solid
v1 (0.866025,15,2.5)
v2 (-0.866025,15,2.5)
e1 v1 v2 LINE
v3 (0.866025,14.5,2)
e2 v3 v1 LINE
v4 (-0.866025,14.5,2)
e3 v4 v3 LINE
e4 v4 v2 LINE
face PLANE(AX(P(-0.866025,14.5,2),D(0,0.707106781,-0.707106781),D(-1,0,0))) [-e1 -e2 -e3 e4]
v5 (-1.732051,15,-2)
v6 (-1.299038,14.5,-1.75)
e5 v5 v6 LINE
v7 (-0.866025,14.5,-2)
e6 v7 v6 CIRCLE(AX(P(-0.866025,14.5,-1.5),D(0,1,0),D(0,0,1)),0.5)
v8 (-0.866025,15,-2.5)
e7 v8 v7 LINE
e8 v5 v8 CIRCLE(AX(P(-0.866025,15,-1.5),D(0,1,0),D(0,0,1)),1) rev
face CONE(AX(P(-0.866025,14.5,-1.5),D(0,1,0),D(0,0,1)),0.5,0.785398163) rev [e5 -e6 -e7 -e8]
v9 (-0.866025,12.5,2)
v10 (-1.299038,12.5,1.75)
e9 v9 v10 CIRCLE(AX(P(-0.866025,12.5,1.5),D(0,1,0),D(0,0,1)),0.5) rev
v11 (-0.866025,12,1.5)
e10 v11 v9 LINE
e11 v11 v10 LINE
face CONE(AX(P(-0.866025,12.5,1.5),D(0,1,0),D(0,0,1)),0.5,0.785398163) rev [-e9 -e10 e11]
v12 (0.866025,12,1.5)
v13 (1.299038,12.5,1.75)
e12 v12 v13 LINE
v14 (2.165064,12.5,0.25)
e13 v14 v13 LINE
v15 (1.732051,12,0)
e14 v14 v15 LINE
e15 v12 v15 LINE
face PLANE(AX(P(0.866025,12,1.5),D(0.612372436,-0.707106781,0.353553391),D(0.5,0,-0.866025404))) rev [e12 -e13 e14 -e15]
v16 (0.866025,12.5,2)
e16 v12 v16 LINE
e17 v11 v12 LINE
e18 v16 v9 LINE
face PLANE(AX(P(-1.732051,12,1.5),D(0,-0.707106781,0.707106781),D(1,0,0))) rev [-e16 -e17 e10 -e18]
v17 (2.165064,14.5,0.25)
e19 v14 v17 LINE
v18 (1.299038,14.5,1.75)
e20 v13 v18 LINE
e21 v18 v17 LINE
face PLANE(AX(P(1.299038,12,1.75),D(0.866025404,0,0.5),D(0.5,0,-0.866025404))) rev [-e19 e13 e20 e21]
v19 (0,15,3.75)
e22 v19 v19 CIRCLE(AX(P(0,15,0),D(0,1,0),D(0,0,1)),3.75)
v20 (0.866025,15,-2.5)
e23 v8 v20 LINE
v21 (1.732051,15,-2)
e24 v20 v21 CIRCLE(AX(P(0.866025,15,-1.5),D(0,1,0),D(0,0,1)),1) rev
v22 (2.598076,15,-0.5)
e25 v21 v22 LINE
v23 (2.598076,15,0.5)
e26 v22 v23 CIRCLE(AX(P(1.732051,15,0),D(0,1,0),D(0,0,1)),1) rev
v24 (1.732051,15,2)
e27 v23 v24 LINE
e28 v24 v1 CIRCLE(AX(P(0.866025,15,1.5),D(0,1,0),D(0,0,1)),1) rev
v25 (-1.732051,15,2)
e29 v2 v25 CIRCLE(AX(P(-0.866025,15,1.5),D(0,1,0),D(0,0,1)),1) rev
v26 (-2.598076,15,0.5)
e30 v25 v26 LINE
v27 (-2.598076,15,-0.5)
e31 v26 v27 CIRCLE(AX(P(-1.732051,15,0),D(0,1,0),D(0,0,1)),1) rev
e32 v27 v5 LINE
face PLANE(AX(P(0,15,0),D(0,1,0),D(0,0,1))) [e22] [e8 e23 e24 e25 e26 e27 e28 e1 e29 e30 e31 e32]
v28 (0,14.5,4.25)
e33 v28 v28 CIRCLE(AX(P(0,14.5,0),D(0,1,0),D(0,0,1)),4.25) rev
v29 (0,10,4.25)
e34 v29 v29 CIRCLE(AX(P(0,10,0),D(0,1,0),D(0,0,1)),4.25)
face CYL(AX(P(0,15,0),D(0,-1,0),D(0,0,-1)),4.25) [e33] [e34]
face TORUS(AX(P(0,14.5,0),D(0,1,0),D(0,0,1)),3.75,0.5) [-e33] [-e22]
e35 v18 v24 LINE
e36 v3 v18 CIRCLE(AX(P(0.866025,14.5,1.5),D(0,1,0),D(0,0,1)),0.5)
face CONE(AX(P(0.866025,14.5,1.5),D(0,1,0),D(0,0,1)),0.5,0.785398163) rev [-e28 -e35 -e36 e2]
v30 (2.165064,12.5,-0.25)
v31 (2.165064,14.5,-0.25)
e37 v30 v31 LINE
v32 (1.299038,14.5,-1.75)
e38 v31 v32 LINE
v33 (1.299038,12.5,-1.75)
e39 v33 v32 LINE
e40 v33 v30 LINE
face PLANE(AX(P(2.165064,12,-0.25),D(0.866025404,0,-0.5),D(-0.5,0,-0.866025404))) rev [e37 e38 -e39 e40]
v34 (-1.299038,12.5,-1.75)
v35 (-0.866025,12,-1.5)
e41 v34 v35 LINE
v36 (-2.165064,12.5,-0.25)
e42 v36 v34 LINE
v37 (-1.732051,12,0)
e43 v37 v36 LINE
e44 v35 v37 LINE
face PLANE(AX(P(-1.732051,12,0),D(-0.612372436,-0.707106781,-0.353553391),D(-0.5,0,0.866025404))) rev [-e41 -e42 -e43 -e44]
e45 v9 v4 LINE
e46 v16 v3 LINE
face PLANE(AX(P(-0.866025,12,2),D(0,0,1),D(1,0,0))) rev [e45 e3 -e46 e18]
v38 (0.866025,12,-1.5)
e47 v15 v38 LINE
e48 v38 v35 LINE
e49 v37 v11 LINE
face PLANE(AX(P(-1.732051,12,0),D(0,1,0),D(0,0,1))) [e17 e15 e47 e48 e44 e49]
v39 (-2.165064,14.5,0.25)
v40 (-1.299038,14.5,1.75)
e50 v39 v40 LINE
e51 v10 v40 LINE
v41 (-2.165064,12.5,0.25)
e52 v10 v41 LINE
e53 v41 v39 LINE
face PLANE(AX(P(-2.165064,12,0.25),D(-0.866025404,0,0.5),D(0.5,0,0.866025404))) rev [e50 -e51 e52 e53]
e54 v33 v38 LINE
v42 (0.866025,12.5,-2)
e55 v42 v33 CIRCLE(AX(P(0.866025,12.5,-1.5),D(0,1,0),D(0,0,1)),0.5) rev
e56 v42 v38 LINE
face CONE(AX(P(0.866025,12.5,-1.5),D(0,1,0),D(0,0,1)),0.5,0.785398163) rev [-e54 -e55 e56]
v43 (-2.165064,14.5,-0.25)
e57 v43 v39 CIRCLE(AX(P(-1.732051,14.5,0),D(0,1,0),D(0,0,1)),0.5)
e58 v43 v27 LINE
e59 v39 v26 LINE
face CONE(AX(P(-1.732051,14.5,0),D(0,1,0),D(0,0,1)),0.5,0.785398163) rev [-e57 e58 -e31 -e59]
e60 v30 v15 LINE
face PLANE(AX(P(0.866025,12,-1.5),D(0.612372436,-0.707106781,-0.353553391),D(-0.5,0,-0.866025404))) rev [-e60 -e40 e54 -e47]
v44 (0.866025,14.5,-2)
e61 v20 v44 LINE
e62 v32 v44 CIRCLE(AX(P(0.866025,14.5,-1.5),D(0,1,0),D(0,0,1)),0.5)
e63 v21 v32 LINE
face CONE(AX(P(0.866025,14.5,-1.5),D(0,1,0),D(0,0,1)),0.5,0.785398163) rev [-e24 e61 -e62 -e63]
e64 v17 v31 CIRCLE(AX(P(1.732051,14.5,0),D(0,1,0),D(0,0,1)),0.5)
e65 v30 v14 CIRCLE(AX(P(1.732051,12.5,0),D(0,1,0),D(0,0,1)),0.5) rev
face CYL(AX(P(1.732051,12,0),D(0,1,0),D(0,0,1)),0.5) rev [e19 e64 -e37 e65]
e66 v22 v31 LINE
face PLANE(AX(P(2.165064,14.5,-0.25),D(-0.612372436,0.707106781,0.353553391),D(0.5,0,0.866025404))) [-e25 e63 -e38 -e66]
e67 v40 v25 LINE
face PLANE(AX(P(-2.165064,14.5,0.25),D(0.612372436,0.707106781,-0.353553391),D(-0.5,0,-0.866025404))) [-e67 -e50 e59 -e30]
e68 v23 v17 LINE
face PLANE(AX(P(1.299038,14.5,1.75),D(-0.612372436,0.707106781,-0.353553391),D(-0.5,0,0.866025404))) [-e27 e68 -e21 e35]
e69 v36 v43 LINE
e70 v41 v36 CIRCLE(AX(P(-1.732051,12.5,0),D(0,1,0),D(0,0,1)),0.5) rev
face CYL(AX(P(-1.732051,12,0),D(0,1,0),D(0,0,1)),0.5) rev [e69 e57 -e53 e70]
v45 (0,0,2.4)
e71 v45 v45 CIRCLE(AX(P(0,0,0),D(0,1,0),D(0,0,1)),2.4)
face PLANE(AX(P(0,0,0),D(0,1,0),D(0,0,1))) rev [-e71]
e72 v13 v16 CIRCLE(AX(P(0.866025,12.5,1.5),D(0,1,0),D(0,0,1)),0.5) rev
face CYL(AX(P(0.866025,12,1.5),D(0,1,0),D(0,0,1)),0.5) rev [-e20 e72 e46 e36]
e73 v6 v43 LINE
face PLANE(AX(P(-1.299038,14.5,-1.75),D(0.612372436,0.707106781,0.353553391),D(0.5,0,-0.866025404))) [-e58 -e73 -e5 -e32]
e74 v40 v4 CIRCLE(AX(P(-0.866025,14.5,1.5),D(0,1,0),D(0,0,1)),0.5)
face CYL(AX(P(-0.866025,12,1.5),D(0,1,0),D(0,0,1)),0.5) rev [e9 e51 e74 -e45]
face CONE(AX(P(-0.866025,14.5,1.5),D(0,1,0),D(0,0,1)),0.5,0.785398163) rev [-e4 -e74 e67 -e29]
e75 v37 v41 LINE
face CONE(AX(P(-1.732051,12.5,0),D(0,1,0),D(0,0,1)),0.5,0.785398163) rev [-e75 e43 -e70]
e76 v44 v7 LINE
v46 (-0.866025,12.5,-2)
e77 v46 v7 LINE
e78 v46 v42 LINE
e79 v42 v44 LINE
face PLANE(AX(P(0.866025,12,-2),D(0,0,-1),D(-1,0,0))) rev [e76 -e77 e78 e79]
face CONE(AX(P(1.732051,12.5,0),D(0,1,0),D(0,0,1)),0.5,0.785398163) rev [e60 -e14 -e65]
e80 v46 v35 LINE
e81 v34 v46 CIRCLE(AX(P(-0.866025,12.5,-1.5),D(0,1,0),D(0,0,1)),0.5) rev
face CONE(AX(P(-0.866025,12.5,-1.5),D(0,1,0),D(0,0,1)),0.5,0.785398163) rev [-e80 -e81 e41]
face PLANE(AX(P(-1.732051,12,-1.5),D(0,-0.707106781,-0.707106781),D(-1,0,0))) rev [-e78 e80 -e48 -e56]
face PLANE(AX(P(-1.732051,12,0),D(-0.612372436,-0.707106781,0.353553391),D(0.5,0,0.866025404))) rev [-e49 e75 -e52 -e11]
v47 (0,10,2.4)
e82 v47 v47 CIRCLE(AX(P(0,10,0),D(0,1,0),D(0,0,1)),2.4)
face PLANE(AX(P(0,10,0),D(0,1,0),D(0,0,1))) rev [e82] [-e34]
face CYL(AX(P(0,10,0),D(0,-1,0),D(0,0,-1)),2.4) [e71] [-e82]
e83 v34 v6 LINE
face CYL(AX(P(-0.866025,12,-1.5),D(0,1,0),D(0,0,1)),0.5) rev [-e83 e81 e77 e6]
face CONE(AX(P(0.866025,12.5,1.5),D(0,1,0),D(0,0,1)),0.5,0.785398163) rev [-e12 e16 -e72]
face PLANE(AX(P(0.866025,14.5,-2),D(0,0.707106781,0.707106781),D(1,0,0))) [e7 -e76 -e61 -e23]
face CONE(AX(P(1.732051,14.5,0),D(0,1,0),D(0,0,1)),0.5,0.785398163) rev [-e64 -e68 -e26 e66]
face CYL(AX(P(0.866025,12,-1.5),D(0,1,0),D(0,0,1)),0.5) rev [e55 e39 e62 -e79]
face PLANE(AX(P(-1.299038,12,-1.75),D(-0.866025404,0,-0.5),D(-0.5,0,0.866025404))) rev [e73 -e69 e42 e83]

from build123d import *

# Parameters (mm, degrees)
SKETCH1_R           = 2.4
BOSS_EXTRUDE1_DEPTH = 10
SKETCH2_R           = 4.25
BOSS_EXTRUDE2_DEPTH = 5
CUT_EXTRUDE1_DEPTH  = 3
CHAMFER1_SIZE       = 0.5
FILLET1_R           = 0.5


with BuildPart() as part:
    # Sketch1 → Boss-Extrude1 (new body)
    with BuildSketch(Plane(origin=(0, 0, 0), x_dir=(1, 0, 0), z_dir=(0, 1, 0))):
        with Locations(Location((0, 0, 0), (0, 0, 270))):
            Circle(SKETCH1_R)
    extrude(amount=BOSS_EXTRUDE1_DEPTH)

    # Sketch2 → Boss-Extrude2 (add)
    with BuildSketch(Plane(origin=(0, 10, 0), x_dir=(1, 0, 0), z_dir=(0, 1, 0))):
        with Locations(Location((0, 0, 0), (0, 0, 270))):
            Circle(SKETCH2_R)
    extrude(amount=BOSS_EXTRUDE2_DEPTH)

    # Sketch3 → Cut-Extrude1 (cut)
    with BuildSketch(Plane(origin=(0, 15, 0), x_dir=(1, 0, 0), z_dir=(0, 1, 0))):
        with BuildLine():
            Line((2.165063509, 0.25), (1.299038106, 1.75))
            ThreePointArc((1.299038106, 1.75), (1.116025404, 1.933012702), (0.866025404, 2))
            Line((0.866025404, 2), (-0.866025404, 2))
            ThreePointArc((-0.866025404, 2), (-1.116025404, 1.933012702), (-1.299038106, 1.75))
            Line((-1.299038106, 1.75), (-2.165063509, 0.25))
            ThreePointArc((-2.165063509, 0.25), (-2.232050808, 0), (-2.165063509, -0.25))
            Line((-2.165063509, -0.25), (-1.299038106, -1.75))
            ThreePointArc((-1.299038106, -1.75), (-1.116025404, -1.933012702), (-0.866025404, -2))
            Line((-0.866025404, -2), (0.866025404, -2))
            ThreePointArc((0.866025404, -2), (1.116025404, -1.933012702), (1.299038106, -1.75))
            Line((1.299038106, -1.75), (2.165063509, -0.25))
            ThreePointArc((2.165063509, -0.25), (2.232050808, 0), (2.165063509, 0.25))
        make_face()
    extrude(amount=-CUT_EXTRUDE1_DEPTH, mode=Mode.SUBTRACT)

    # Chamfer1
    chamfer1_edges = [part.edges().sort_by_distance(p)[0] for p in [
        (-2.232050808, 12, 0),
        (-1.732050808, 12, -1),
        (-1.116025404, 12, -1.933012702),
        (0, 12, -2),
        (1.116025404, 12, -1.933012702),
        (1.732050808, 12, -1),
        (2.232050808, 12, 0),
        (1.732050808, 12, 1),
        (1.116025404, 12, 1.933012702),
        (0, 12, 2),
        (-1.116025404, 12, 1.933012702),
        (-1.732050808, 12, 1),
        (-2.232050808, 15, 0),
        (-1.732050808, 15, 1),
        (-1.116025404, 15, 1.933012702),
        (0, 15, 2),
        (1.116025404, 15, 1.933012702),
        (1.732050808, 15, 1),
        (2.232050808, 15, 0),
        (1.732050808, 15, -1),
        (1.116025404, 15, -1.933012702),
        (0, 15, -2),
        (-1.116025404, 15, -1.933012702),
        (-1.732050808, 15, -1),
    ]]
    chamfer(chamfer1_edges, length=CHAMFER1_SIZE - 0.0001)  # a hair under: the kernel refuses the full size

    # Fillet1
    fillet1_edges = [part.edges().sort_by_distance(p)[0] for p in [
        (0, 15, -4.25),
    ]]
    fillet(fillet1_edges, radius=FILLET1_R)


solid = part.part
